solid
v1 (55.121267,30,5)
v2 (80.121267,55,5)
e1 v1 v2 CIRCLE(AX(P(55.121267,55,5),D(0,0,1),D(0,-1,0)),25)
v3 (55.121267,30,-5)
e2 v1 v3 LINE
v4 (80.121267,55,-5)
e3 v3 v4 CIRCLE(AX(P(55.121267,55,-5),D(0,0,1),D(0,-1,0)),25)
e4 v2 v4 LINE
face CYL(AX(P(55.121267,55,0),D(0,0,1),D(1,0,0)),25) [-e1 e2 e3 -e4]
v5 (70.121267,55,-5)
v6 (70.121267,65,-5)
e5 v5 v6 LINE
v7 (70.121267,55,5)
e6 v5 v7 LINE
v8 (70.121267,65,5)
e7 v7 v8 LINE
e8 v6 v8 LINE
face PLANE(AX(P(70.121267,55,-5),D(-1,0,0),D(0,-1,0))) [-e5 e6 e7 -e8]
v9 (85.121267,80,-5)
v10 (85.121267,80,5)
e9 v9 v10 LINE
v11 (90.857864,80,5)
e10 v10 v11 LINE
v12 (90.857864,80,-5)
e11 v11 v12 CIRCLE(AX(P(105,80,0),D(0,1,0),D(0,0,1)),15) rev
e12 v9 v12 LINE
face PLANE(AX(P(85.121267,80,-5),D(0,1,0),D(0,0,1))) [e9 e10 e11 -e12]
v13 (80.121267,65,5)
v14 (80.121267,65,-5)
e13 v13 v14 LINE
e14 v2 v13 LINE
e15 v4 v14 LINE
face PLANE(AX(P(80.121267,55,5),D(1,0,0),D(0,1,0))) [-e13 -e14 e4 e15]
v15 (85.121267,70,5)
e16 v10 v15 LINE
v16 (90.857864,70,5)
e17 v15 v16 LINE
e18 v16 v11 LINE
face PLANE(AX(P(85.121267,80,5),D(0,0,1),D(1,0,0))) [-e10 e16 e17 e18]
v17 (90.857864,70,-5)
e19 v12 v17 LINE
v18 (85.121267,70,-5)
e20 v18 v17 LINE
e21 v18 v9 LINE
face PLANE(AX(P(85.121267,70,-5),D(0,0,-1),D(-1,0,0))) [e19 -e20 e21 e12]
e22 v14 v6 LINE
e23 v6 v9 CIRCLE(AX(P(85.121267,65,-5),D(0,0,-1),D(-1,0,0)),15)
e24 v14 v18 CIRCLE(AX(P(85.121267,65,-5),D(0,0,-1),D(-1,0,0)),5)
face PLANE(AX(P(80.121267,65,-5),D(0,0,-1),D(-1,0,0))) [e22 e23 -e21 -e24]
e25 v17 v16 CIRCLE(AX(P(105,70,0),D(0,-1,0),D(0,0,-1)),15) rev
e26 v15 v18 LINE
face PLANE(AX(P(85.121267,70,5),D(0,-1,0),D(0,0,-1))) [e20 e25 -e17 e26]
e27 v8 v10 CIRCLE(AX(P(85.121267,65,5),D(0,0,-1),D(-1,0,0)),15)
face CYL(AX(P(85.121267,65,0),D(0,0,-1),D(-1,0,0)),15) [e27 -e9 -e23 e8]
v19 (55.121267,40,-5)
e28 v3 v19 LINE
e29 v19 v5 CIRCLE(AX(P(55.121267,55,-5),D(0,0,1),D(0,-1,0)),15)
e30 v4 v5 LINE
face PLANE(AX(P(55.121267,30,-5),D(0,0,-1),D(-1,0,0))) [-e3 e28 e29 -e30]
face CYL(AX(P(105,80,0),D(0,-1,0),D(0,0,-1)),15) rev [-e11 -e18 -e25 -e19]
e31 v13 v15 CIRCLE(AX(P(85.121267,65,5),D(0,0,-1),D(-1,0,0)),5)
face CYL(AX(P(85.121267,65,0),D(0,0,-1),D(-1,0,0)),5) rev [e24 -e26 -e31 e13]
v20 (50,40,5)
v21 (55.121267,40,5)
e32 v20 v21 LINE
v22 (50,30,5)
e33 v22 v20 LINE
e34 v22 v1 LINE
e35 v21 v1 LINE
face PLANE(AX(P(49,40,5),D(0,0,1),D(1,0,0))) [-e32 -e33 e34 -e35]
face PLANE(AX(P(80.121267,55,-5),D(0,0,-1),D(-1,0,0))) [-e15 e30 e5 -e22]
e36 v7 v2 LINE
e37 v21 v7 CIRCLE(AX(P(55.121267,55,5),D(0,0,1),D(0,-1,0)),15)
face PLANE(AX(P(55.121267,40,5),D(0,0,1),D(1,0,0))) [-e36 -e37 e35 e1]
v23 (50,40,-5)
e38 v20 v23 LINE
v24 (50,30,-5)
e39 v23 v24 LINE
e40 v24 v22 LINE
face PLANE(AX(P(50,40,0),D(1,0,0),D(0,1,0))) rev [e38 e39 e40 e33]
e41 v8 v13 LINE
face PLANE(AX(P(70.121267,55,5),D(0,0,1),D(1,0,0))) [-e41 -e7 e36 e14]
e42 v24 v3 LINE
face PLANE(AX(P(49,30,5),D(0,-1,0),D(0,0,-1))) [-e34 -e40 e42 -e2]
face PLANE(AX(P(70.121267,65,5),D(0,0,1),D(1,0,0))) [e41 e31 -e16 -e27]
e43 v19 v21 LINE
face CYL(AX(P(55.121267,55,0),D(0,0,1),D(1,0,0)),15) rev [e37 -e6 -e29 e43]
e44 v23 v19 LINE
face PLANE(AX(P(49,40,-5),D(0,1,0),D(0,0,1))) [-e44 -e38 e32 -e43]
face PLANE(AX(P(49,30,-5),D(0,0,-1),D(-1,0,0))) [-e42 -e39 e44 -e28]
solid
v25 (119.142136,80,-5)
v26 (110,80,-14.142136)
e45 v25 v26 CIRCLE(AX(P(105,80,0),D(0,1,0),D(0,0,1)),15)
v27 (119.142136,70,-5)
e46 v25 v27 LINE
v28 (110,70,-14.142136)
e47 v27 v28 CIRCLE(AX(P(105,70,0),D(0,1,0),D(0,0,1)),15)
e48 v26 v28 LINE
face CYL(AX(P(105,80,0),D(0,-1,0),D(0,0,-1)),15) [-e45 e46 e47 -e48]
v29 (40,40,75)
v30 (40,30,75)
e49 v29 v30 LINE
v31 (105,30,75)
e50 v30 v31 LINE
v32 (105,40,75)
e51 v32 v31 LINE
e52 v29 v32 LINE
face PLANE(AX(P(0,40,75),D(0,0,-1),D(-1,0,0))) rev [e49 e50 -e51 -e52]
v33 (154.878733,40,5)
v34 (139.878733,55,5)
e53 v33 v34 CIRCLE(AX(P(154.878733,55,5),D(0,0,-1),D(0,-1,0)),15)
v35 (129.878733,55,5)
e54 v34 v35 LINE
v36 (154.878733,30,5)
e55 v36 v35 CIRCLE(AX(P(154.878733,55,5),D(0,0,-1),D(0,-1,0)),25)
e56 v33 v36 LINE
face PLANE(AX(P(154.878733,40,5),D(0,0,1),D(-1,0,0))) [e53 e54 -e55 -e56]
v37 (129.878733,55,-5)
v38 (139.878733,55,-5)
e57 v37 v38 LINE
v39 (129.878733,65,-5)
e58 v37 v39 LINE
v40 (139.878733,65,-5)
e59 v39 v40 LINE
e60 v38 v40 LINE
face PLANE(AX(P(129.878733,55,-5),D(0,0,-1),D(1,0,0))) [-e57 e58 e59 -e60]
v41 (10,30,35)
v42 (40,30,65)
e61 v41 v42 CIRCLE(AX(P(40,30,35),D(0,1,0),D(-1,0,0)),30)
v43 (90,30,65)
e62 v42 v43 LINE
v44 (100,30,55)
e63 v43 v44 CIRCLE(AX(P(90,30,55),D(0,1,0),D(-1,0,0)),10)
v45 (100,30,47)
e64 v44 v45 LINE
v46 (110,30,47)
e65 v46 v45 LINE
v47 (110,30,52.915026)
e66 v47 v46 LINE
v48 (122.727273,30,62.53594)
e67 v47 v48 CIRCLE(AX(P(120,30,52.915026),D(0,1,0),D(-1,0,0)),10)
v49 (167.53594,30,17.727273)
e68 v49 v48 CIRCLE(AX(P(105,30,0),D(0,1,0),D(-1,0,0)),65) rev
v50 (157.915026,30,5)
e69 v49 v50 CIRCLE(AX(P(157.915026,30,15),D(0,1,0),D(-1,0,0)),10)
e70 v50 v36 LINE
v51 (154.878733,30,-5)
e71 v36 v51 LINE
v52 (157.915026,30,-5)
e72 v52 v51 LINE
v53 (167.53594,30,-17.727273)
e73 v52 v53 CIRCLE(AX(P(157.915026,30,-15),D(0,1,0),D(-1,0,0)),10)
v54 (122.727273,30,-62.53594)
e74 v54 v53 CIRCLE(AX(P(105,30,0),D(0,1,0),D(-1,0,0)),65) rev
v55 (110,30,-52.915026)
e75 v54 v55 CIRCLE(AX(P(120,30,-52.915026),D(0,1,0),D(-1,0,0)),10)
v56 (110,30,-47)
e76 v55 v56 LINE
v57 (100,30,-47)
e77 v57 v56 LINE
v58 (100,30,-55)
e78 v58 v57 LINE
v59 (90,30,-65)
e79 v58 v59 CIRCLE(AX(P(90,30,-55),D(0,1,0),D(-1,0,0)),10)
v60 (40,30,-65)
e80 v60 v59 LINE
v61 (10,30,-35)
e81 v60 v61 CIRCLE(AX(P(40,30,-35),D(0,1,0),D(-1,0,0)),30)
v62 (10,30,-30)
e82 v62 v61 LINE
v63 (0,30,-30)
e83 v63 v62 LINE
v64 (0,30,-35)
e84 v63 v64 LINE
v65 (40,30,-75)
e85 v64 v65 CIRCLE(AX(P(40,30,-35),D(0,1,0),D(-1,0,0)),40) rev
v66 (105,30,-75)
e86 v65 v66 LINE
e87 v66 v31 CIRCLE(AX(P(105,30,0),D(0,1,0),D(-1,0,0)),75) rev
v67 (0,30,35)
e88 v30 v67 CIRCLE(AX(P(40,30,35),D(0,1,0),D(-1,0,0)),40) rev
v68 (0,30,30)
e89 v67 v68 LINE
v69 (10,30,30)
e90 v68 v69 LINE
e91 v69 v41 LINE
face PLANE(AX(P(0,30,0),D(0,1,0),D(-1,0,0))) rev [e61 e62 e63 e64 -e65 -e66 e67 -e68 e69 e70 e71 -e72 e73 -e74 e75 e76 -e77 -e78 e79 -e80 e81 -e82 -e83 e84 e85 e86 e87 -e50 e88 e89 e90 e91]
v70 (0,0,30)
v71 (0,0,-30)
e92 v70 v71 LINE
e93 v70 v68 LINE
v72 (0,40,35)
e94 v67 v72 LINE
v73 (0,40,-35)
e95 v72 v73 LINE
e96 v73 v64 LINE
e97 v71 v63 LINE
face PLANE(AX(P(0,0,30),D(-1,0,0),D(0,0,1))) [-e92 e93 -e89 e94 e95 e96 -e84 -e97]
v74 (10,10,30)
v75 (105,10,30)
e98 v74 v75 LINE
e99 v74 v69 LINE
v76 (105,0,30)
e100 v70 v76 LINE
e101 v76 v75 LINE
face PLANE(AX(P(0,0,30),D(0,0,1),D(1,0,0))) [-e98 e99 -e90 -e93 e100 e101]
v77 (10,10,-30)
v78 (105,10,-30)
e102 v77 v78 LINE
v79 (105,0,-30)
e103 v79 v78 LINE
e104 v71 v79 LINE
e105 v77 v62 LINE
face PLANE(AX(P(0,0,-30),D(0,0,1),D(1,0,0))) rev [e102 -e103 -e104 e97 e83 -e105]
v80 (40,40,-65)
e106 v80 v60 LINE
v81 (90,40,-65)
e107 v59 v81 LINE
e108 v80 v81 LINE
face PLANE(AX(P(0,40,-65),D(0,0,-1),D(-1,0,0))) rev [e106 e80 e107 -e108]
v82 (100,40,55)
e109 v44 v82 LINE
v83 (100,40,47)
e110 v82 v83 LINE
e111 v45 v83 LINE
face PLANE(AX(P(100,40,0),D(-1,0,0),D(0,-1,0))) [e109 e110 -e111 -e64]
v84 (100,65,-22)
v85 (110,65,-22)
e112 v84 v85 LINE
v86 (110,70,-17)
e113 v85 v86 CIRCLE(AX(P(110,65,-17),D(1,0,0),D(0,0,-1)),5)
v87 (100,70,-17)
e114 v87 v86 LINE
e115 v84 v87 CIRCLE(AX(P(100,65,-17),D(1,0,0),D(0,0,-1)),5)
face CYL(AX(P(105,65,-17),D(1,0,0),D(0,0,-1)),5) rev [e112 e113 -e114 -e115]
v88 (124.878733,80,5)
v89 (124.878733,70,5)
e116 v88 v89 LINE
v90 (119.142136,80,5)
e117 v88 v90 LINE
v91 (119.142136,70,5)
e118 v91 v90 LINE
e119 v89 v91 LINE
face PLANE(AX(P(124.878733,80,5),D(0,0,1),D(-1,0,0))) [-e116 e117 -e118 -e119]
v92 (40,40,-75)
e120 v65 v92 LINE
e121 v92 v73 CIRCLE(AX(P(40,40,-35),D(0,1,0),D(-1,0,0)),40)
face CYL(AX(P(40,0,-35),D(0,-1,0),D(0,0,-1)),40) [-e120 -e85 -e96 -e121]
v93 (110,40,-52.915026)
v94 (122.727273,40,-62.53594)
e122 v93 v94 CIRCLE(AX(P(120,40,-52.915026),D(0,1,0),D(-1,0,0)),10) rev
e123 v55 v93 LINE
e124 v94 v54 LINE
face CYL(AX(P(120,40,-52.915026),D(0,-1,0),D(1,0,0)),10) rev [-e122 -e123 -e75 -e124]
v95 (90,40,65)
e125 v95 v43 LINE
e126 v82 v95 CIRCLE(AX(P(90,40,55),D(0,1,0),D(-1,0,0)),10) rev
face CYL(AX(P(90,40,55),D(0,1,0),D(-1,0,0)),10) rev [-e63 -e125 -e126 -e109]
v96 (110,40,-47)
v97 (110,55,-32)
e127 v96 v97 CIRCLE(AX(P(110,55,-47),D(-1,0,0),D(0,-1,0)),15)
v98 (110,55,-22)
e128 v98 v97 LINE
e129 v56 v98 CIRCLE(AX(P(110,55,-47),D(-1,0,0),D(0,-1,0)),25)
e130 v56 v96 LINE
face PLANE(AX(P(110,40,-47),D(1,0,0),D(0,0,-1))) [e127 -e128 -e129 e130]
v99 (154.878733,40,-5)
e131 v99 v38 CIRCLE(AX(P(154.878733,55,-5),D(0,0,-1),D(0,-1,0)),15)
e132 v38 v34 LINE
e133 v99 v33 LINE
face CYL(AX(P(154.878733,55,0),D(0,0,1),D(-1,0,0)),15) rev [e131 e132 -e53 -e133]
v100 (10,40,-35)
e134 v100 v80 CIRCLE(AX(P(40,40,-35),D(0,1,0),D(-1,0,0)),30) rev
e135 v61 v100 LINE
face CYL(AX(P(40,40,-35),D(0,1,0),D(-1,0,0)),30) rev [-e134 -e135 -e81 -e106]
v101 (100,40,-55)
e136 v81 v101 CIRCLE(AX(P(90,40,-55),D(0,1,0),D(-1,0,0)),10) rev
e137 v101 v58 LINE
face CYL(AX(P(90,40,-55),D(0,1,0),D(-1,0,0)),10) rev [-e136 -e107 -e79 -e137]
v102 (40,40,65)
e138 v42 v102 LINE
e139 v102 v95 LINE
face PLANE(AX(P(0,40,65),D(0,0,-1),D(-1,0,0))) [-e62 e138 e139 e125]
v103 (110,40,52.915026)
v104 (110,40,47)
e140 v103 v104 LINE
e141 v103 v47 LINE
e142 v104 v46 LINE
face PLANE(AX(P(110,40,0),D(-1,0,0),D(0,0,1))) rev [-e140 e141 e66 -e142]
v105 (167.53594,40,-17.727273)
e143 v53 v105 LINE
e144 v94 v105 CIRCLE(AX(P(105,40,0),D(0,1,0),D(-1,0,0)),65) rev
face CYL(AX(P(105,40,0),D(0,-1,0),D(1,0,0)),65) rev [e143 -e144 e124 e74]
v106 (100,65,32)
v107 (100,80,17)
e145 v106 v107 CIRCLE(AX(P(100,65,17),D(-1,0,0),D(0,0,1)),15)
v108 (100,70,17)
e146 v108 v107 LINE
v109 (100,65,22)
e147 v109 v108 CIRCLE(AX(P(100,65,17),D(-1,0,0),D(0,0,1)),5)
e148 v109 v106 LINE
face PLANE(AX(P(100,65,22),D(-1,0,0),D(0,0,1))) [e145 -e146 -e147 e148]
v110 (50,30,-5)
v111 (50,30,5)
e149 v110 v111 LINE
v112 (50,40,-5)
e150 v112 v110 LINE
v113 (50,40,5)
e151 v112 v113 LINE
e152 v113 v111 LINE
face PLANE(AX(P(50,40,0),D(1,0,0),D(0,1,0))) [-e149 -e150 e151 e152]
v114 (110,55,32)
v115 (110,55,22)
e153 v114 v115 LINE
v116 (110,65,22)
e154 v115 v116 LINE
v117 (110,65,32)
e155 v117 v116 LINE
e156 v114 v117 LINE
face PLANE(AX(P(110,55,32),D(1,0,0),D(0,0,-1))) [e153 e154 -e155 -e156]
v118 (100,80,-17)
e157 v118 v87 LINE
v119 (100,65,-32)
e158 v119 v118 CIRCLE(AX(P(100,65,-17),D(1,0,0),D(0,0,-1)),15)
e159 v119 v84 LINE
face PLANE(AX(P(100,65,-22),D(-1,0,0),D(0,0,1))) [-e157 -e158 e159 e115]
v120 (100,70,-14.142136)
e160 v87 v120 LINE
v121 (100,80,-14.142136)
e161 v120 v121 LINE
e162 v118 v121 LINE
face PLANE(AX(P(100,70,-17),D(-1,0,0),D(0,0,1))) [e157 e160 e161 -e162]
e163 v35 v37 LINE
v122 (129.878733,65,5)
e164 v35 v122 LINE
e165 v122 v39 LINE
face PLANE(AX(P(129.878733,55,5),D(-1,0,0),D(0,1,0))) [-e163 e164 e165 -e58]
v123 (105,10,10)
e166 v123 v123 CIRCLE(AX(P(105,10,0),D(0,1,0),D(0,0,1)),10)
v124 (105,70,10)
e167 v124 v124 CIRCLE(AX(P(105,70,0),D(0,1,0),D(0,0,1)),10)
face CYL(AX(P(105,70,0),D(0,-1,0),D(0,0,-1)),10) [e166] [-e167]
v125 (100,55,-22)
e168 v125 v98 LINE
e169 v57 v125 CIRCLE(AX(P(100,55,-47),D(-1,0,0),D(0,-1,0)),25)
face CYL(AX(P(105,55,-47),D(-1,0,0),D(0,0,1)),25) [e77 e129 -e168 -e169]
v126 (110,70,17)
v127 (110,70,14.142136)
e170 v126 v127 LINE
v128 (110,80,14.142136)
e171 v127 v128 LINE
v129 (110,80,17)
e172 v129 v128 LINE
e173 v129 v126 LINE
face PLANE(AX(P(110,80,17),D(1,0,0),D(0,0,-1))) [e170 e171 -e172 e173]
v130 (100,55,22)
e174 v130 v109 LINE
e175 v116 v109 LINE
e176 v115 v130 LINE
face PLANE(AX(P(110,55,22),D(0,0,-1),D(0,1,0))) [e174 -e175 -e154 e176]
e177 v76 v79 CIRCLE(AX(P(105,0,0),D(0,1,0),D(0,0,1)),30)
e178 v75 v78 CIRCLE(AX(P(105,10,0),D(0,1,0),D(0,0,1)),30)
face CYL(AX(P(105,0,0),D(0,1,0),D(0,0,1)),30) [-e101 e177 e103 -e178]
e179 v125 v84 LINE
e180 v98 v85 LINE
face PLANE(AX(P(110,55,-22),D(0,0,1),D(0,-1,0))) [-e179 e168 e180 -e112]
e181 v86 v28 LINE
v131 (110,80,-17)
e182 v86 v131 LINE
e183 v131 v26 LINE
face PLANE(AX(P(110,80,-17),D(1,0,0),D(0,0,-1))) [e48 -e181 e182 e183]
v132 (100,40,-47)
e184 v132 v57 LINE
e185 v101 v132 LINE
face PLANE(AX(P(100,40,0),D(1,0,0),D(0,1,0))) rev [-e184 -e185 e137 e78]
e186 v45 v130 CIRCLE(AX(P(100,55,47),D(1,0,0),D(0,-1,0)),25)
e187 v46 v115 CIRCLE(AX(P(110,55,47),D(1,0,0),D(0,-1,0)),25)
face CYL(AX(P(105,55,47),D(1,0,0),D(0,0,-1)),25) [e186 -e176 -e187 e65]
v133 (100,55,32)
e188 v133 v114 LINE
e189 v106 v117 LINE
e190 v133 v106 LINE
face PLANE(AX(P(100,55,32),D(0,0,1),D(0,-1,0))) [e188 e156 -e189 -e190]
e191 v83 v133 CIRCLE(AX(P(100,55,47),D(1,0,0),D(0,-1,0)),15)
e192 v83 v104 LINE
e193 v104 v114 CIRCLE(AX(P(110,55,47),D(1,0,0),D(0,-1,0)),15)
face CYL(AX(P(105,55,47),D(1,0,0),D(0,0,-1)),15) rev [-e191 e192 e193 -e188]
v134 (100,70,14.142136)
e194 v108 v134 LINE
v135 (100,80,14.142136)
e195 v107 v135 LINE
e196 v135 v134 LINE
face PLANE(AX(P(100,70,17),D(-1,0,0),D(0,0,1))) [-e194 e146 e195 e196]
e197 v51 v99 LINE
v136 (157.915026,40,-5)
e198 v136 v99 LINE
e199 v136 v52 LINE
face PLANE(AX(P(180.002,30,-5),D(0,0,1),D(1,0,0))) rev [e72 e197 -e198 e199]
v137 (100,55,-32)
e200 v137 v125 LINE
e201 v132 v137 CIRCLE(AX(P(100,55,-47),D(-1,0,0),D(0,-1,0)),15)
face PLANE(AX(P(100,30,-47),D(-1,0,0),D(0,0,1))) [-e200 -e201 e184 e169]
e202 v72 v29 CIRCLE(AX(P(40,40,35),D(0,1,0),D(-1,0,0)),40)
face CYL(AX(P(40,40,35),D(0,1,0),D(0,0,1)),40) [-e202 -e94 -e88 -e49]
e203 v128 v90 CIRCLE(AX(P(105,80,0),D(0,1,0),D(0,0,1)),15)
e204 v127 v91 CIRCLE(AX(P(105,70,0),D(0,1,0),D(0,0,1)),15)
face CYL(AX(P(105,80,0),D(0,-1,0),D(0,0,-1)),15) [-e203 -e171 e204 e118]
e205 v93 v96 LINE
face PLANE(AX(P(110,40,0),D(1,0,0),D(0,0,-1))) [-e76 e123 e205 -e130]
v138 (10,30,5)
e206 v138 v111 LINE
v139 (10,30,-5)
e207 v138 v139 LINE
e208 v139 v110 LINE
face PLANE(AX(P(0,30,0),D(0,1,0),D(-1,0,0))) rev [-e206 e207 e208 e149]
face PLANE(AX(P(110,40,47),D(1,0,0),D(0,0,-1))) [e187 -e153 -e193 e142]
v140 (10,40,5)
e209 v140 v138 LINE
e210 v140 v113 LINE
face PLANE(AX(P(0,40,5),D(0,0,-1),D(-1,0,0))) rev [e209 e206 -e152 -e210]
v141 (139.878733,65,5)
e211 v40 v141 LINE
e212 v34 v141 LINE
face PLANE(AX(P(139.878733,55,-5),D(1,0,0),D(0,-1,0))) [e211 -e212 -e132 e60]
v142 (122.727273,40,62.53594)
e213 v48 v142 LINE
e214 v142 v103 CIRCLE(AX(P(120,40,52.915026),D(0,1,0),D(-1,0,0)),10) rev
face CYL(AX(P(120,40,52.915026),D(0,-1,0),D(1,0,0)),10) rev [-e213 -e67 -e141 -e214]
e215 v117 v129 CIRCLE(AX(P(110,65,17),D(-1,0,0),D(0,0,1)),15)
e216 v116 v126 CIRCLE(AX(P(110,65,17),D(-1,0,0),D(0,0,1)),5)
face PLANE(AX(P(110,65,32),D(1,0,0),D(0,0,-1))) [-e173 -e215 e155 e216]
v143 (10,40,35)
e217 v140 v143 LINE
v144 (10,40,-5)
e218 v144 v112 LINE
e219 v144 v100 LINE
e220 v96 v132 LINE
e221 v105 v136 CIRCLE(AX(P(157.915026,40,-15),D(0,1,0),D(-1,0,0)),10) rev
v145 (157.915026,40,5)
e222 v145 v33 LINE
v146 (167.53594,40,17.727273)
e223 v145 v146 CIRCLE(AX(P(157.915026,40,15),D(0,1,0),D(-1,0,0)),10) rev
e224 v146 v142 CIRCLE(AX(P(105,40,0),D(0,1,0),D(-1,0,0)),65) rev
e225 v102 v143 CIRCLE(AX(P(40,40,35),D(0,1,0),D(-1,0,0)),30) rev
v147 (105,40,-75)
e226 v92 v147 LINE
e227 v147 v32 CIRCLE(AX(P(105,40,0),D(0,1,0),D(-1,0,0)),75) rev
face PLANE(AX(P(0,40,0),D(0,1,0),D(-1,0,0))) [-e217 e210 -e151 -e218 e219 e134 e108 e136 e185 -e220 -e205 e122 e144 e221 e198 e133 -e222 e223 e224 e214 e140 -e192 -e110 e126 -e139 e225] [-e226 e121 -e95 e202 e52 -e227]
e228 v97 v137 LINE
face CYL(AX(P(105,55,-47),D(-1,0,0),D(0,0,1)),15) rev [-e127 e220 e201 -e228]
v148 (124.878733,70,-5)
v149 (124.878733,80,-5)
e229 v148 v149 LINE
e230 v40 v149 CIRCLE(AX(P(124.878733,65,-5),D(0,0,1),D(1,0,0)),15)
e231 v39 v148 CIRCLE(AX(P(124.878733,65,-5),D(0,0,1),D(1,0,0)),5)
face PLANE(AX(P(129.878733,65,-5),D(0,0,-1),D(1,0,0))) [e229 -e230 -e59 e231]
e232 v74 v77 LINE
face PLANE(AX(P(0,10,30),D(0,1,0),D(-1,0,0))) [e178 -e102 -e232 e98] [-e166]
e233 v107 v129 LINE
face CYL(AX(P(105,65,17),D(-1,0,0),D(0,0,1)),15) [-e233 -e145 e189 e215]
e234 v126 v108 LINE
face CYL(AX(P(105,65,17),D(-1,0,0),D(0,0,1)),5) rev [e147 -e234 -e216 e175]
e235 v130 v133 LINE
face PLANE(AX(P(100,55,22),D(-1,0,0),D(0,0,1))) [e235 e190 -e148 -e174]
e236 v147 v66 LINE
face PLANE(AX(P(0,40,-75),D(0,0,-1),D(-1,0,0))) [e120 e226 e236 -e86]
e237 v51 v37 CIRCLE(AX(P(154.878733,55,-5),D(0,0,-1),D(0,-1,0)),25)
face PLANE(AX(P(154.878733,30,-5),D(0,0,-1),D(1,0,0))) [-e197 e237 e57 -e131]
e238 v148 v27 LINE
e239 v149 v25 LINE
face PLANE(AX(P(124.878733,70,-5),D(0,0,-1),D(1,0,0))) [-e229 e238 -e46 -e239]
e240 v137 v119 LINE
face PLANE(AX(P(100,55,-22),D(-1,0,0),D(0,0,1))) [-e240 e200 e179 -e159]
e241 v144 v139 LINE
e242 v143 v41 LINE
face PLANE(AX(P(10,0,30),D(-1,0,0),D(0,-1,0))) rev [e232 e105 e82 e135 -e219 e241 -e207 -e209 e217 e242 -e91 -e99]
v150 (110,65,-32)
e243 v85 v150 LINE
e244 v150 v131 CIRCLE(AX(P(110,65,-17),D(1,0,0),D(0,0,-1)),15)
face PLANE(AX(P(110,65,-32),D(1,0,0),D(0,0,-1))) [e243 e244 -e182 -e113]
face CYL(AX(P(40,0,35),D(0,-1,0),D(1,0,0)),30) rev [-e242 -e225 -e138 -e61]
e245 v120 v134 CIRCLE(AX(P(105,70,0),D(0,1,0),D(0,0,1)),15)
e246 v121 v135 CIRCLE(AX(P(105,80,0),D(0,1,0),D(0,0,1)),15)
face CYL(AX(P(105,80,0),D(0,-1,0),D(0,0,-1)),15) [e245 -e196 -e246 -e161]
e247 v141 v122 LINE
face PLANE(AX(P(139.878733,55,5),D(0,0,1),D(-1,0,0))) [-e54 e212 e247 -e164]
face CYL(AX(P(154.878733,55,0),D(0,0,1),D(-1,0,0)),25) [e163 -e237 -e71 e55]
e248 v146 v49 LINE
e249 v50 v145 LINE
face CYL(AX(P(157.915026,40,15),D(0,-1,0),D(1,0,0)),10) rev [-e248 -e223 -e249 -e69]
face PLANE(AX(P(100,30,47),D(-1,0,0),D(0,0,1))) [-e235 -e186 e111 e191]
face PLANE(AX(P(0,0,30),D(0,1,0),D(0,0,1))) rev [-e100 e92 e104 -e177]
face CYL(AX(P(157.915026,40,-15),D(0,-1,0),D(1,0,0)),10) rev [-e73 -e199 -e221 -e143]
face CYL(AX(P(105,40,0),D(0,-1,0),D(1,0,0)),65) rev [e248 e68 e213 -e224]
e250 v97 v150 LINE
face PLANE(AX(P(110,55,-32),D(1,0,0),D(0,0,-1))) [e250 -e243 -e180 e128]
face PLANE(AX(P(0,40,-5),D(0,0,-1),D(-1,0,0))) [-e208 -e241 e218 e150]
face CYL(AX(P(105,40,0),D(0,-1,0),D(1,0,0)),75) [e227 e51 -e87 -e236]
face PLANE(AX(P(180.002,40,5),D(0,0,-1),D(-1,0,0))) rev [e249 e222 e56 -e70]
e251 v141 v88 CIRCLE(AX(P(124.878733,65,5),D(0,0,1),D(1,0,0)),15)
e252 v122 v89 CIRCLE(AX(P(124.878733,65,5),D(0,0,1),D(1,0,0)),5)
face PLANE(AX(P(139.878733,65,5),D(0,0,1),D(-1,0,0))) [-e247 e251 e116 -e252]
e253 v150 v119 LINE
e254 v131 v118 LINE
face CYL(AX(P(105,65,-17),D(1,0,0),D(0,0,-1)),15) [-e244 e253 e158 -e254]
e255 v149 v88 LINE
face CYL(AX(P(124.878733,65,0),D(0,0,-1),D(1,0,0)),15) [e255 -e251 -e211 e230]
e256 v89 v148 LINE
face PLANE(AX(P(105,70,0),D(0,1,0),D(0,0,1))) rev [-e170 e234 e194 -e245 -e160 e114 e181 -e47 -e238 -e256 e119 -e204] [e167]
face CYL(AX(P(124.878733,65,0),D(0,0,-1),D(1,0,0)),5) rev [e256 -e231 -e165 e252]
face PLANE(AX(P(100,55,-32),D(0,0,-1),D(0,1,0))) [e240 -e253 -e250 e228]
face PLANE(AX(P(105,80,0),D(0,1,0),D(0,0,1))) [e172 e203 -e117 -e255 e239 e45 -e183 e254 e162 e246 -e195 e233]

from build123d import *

# Parameters (mm, degrees)
BOSS_EXTRUDE1_DEPTH = 30
BOSS_EXTRUDE2_DEPTH = 10
SKETCH4_R           = 10
BOSS_EXTRUDE3_DEPTH = 60
SKETCH5_R           = 15
BOSS_EXTRUDE4_DEPTH = 10
BOSS_EXTRUDE5_DEPTH = 10
SWEEP4_START        = 55
SWEEP4_OUTLINE_W    = 10
SWEEP4_OUTLINE_H    = 10
SWEEP4_DEPTH        = 10
SWEEP4_START_2      = 30
SWEEP4_2_DEPTH      = 25
SWEEP4_START_3      = 65
SWEEP4_3_DEPTH      = 15
SWEEP4_START_4      = -5
SWEEP4_4_DEPTH      = 10
SWEEP6_START        = 100
SWEEP6_DEPTH        = 10
BOSS_EXTRUDE6_REACH = 195.972
SKETCH12_W          = 10
SKETCH12_H          = 10
FILLET1_R           = 30
FILLET2_R           = 40
FILLET3_R           = 10


with BuildPart() as part:
    # Sketch2 → Boss-Extrude1 (new, symmetric)
    with BuildSketch(Plane.XY):
        Polygon((0, 10), (0, 0), (10, 0), (105, 0), (105, 10), (10, 10), (10, 30), (0, 30), align=None)
    extrude(amount=BOSS_EXTRUDE1_DEPTH, both=True)

    # Sketch3 → Boss-Extrude2 (add)
    with BuildSketch(Plane(origin=(0, 10, 0), x_dir=(1, 0, 0), z_dir=(0, 1, 0))):
        with BuildLine():
            Line((105, 30), (105, -30))
            ThreePointArc((105, -30), (135, 0), (105, 30))
        make_face()
    extrude(amount=-BOSS_EXTRUDE2_DEPTH)

    # Sketch4 → Boss-Extrude3 (add)
    with BuildSketch(Plane(origin=(0, 10, 0), x_dir=(1, 0, 0), z_dir=(0, 1, 0))):
        with Locations(Location((105, 0, 0), (0, 0, 270))):
            Circle(SKETCH4_R)
    extrude(amount=BOSS_EXTRUDE3_DEPTH)

    # Sketch5 → Boss-Extrude4 (add)
    with BuildSketch(Plane(origin=(0, 70, 0), x_dir=(1, 0, 0), z_dir=(0, 1, 0))):
        with Locations(Location((105, 0, 0), (0, 0, 270))):
            Circle(SKETCH5_R)
    extrude(amount=BOSS_EXTRUDE4_DEPTH)

    # Sketch6 → Boss-Extrude5 (add)
    with BuildSketch(Plane(origin=(0, 30, 0), x_dir=(1, 0, 0), z_dir=(0, 1, 0))):
        with BuildLine():
            Line((0, 75), (0, 0))
            Line((0, 0), (0, -75))
            Line((0, -75), (105, -75))
            ThreePointArc((105, -75), (158.033008589, -53.033008589), (180, 0))
            ThreePointArc((180, 0), (158.033008589, 53.033008589), (105, 75))
            Line((105, 75), (0, 75))
        make_face()
        with BuildLine():
            Line((10, -65), (10, -5))
            Line((10, -5), (50, -5))
            Line((50, -5), (50, 5))
            Line((50, 5), (10, 5))
            Line((10, 5), (10, 65))
            Line((10, 65), (100, 65))
            Line((100, 65), (100, 50))
            Line((100, 50), (110, 50))
            Line((110, 50), (110, 64.807406984))
            ThreePointArc((110, 64.807406984), (152.696960071, 44.158804332), (170, 0))
            ThreePointArc((170, 0), (152.696960071, -44.158804332), (110, -64.807406984))
            Line((110, -64.807406984), (110, -50))
            Line((110, -50), (100, -50))
            Line((100, -50), (100, -65))
            Line((100, -65), (10, -65))
        make_face(mode=Mode.SUBTRACT)
    extrude(amount=BOSS_EXTRUDE5_DEPTH)

    # Sweep6: read off the stored shape, not the designer's step
    # Sweep6 outline → Sweep6 (add)
    with BuildSketch(Plane.YZ.offset(SWEEP6_START)):
        with BuildLine():
            Line((70, 17), (70, 13))
            Line((70, 13), (80, 13))
            Line((80, 13), (80, 17))
            ThreePointArc((80, 17), (75.606601718, 27.606601718), (65, 32))
            Line((65, 32), (55, 32))
            ThreePointArc((55, 32), (44.393398282, 36.393398282), (40, 47))
            Line((40, 47), (40, 50))
            Line((40, 50), (30, 50))
            Line((30, 50), (30, 47))
            ThreePointArc((30, 47), (37.32233047, 29.32233047), (55, 22))
            Line((55, 22), (65, 22))
            ThreePointArc((65, 22), (68.535533906, 20.535533906), (70, 17))
        make_face()
    sweep6 = extrude(amount=SWEEP6_DEPTH)

    # Mirror1: Sweep6 across plane
    add(sweep6.mirror(Plane.XY))

    # Sketch12 → Boss-Extrude6 (add, up to next)
    with BuildSketch(Plane(origin=(160, 0, 0), x_dir=(0, 0, -1), z_dir=(1, 0, 0)), mode=Mode.PRIVATE) as boss_extrude6_sk1:
        with Locations((0, 35)):
            Rectangle(SKETCH12_W, SKETCH12_H)
    boss_extrude6_tool1 = extrude(boss_extrude6_sk1.sketch, amount=BOSS_EXTRUDE6_REACH, mode=Mode.PRIVATE) - part.part


with BuildPart() as body_2:
    # Sweep4: read off the stored shape, not the designer's step
    # Sweep4 outline → Sweep4 (new body)
    with BuildSketch(Plane(origin=(0, 0, 0), x_dir=(1, 0, 0), z_dir=(0, 1, 0)).offset(SWEEP4_START)):
        with Locations((75.121266537, 0)):
            Rectangle(SWEEP4_OUTLINE_W, SWEEP4_OUTLINE_H)
    extrude(amount=SWEEP4_DEPTH)

    # Sweep4 2 outline → Sweep4 2 (add)
    with BuildSketch(Plane(origin=(0, 0, 0), x_dir=(1, 0, 0), z_dir=(0, 1, 0)).offset(SWEEP4_START_2)):
        with BuildLine():
            Line((50, -5), (90.857864376, -5))
            ThreePointArc((90.857864376, -5), (90, 0), (90.857864376, 5))
            Line((90.857864376, 5), (50, 5))
            Line((50, 5), (50, -5))
        make_face()
    extrude(amount=SWEEP4_2_DEPTH)

    # Sweep4 3 outline → Sweep4 3 (add)
    with BuildSketch(Plane(origin=(0, 0, 0), x_dir=(1, 0, 0), z_dir=(0, 1, 0)).offset(SWEEP4_START_3)):
        with BuildLine():
            Line((50, -5), (90.857864376, -5))
            ThreePointArc((90.857864376, -5), (90, 0), (90.857864376, 5))
            Line((90.857864376, 5), (50, 5))
            Line((50, 5), (50, -5))
        make_face()
    extrude(amount=SWEEP4_3_DEPTH)

    # Sweep4 4 outline → Sweep4 4 (cut)
    with BuildSketch(Plane.XY.offset(SWEEP4_START_4)):
        with BuildLine():
            ThreePointArc((70.121266537, 65), (74.514664819, 75.606601718), (85.121266537, 80))
            Line((85.121266537, 80), (50, 80))
            Line((50, 80), (50, 65))
            Line((50, 65), (70.121266537, 65))
        make_face()
        with BuildLine():
            Line((50, 40), (55.121266537, 40))
            ThreePointArc((55.121266537, 40), (65.727868255, 44.393398282), (70.121266537, 55))
            Line((70.121266537, 55), (50, 55))
            Line((50, 55), (50, 40))
        make_face()
        with BuildLine():
            ThreePointArc((80.121266537, 55), (72.798936067, 37.32233047), (55.121266537, 30))
            Line((55.121266537, 30), (92, 30))
            Line((92, 30), (92, 55))
            Line((92, 55), (80.121266537, 55))
        make_face()
        with BuildLine():
            Line((92, 65), (92, 70))
            Line((92, 70), (85.121266537, 70))
            ThreePointArc((85.121266537, 70), (81.585732631, 68.535533906), (80.121266537, 65))
            Line((80.121266537, 65), (92, 65))
        make_face()
    extrude(amount=SWEEP4_4_DEPTH, mode=Mode.SUBTRACT)


with BuildPart() as body_3:
    # Mirror4: mirrored copy
    add(body_2.part.mirror(Plane(origin=(105, 0, 0), x_dir=(0, 0, 1), z_dir=(1, 0, 0))))


with BuildPart() as part_1:
    add(part.part)

    add(body_3.part)  # Boss-Extrude6 merges body 3
    add(boss_extrude6_tool1.solids().sort_by_distance((160, 35, 0))[0])

    # Fillet1
    fillet1_edges = [part_1.edges().sort_by_distance(p)[0] for p in [
        (10, 35, 65),
        (10, 35, -65),
    ]]
    fillet(fillet1_edges, radius=FILLET1_R)

    # Fillet2
    fillet2_edges = [part_1.edges().sort_by_distance(p)[0] for p in [
        (0, 35, -75),
        (0, 35, 75),
    ]]
    fillet(fillet2_edges, radius=FILLET2_R)

    # Fillet3
    fillet3_edges = [part_1.edges().sort_by_distance(p)[0] for p in [
        (169.807406984, 35, 5),
        (169.807406984, 35, -5),
        (110, 35, -64.807406984),
        (110, 35, 64.807406984),
        (100, 35, 65),
        (100, 35, -65),
    ]]
    fillet(fillet3_edges, radius=FILLET3_R)


solid = Compound([body_2.part, part_1.part])
